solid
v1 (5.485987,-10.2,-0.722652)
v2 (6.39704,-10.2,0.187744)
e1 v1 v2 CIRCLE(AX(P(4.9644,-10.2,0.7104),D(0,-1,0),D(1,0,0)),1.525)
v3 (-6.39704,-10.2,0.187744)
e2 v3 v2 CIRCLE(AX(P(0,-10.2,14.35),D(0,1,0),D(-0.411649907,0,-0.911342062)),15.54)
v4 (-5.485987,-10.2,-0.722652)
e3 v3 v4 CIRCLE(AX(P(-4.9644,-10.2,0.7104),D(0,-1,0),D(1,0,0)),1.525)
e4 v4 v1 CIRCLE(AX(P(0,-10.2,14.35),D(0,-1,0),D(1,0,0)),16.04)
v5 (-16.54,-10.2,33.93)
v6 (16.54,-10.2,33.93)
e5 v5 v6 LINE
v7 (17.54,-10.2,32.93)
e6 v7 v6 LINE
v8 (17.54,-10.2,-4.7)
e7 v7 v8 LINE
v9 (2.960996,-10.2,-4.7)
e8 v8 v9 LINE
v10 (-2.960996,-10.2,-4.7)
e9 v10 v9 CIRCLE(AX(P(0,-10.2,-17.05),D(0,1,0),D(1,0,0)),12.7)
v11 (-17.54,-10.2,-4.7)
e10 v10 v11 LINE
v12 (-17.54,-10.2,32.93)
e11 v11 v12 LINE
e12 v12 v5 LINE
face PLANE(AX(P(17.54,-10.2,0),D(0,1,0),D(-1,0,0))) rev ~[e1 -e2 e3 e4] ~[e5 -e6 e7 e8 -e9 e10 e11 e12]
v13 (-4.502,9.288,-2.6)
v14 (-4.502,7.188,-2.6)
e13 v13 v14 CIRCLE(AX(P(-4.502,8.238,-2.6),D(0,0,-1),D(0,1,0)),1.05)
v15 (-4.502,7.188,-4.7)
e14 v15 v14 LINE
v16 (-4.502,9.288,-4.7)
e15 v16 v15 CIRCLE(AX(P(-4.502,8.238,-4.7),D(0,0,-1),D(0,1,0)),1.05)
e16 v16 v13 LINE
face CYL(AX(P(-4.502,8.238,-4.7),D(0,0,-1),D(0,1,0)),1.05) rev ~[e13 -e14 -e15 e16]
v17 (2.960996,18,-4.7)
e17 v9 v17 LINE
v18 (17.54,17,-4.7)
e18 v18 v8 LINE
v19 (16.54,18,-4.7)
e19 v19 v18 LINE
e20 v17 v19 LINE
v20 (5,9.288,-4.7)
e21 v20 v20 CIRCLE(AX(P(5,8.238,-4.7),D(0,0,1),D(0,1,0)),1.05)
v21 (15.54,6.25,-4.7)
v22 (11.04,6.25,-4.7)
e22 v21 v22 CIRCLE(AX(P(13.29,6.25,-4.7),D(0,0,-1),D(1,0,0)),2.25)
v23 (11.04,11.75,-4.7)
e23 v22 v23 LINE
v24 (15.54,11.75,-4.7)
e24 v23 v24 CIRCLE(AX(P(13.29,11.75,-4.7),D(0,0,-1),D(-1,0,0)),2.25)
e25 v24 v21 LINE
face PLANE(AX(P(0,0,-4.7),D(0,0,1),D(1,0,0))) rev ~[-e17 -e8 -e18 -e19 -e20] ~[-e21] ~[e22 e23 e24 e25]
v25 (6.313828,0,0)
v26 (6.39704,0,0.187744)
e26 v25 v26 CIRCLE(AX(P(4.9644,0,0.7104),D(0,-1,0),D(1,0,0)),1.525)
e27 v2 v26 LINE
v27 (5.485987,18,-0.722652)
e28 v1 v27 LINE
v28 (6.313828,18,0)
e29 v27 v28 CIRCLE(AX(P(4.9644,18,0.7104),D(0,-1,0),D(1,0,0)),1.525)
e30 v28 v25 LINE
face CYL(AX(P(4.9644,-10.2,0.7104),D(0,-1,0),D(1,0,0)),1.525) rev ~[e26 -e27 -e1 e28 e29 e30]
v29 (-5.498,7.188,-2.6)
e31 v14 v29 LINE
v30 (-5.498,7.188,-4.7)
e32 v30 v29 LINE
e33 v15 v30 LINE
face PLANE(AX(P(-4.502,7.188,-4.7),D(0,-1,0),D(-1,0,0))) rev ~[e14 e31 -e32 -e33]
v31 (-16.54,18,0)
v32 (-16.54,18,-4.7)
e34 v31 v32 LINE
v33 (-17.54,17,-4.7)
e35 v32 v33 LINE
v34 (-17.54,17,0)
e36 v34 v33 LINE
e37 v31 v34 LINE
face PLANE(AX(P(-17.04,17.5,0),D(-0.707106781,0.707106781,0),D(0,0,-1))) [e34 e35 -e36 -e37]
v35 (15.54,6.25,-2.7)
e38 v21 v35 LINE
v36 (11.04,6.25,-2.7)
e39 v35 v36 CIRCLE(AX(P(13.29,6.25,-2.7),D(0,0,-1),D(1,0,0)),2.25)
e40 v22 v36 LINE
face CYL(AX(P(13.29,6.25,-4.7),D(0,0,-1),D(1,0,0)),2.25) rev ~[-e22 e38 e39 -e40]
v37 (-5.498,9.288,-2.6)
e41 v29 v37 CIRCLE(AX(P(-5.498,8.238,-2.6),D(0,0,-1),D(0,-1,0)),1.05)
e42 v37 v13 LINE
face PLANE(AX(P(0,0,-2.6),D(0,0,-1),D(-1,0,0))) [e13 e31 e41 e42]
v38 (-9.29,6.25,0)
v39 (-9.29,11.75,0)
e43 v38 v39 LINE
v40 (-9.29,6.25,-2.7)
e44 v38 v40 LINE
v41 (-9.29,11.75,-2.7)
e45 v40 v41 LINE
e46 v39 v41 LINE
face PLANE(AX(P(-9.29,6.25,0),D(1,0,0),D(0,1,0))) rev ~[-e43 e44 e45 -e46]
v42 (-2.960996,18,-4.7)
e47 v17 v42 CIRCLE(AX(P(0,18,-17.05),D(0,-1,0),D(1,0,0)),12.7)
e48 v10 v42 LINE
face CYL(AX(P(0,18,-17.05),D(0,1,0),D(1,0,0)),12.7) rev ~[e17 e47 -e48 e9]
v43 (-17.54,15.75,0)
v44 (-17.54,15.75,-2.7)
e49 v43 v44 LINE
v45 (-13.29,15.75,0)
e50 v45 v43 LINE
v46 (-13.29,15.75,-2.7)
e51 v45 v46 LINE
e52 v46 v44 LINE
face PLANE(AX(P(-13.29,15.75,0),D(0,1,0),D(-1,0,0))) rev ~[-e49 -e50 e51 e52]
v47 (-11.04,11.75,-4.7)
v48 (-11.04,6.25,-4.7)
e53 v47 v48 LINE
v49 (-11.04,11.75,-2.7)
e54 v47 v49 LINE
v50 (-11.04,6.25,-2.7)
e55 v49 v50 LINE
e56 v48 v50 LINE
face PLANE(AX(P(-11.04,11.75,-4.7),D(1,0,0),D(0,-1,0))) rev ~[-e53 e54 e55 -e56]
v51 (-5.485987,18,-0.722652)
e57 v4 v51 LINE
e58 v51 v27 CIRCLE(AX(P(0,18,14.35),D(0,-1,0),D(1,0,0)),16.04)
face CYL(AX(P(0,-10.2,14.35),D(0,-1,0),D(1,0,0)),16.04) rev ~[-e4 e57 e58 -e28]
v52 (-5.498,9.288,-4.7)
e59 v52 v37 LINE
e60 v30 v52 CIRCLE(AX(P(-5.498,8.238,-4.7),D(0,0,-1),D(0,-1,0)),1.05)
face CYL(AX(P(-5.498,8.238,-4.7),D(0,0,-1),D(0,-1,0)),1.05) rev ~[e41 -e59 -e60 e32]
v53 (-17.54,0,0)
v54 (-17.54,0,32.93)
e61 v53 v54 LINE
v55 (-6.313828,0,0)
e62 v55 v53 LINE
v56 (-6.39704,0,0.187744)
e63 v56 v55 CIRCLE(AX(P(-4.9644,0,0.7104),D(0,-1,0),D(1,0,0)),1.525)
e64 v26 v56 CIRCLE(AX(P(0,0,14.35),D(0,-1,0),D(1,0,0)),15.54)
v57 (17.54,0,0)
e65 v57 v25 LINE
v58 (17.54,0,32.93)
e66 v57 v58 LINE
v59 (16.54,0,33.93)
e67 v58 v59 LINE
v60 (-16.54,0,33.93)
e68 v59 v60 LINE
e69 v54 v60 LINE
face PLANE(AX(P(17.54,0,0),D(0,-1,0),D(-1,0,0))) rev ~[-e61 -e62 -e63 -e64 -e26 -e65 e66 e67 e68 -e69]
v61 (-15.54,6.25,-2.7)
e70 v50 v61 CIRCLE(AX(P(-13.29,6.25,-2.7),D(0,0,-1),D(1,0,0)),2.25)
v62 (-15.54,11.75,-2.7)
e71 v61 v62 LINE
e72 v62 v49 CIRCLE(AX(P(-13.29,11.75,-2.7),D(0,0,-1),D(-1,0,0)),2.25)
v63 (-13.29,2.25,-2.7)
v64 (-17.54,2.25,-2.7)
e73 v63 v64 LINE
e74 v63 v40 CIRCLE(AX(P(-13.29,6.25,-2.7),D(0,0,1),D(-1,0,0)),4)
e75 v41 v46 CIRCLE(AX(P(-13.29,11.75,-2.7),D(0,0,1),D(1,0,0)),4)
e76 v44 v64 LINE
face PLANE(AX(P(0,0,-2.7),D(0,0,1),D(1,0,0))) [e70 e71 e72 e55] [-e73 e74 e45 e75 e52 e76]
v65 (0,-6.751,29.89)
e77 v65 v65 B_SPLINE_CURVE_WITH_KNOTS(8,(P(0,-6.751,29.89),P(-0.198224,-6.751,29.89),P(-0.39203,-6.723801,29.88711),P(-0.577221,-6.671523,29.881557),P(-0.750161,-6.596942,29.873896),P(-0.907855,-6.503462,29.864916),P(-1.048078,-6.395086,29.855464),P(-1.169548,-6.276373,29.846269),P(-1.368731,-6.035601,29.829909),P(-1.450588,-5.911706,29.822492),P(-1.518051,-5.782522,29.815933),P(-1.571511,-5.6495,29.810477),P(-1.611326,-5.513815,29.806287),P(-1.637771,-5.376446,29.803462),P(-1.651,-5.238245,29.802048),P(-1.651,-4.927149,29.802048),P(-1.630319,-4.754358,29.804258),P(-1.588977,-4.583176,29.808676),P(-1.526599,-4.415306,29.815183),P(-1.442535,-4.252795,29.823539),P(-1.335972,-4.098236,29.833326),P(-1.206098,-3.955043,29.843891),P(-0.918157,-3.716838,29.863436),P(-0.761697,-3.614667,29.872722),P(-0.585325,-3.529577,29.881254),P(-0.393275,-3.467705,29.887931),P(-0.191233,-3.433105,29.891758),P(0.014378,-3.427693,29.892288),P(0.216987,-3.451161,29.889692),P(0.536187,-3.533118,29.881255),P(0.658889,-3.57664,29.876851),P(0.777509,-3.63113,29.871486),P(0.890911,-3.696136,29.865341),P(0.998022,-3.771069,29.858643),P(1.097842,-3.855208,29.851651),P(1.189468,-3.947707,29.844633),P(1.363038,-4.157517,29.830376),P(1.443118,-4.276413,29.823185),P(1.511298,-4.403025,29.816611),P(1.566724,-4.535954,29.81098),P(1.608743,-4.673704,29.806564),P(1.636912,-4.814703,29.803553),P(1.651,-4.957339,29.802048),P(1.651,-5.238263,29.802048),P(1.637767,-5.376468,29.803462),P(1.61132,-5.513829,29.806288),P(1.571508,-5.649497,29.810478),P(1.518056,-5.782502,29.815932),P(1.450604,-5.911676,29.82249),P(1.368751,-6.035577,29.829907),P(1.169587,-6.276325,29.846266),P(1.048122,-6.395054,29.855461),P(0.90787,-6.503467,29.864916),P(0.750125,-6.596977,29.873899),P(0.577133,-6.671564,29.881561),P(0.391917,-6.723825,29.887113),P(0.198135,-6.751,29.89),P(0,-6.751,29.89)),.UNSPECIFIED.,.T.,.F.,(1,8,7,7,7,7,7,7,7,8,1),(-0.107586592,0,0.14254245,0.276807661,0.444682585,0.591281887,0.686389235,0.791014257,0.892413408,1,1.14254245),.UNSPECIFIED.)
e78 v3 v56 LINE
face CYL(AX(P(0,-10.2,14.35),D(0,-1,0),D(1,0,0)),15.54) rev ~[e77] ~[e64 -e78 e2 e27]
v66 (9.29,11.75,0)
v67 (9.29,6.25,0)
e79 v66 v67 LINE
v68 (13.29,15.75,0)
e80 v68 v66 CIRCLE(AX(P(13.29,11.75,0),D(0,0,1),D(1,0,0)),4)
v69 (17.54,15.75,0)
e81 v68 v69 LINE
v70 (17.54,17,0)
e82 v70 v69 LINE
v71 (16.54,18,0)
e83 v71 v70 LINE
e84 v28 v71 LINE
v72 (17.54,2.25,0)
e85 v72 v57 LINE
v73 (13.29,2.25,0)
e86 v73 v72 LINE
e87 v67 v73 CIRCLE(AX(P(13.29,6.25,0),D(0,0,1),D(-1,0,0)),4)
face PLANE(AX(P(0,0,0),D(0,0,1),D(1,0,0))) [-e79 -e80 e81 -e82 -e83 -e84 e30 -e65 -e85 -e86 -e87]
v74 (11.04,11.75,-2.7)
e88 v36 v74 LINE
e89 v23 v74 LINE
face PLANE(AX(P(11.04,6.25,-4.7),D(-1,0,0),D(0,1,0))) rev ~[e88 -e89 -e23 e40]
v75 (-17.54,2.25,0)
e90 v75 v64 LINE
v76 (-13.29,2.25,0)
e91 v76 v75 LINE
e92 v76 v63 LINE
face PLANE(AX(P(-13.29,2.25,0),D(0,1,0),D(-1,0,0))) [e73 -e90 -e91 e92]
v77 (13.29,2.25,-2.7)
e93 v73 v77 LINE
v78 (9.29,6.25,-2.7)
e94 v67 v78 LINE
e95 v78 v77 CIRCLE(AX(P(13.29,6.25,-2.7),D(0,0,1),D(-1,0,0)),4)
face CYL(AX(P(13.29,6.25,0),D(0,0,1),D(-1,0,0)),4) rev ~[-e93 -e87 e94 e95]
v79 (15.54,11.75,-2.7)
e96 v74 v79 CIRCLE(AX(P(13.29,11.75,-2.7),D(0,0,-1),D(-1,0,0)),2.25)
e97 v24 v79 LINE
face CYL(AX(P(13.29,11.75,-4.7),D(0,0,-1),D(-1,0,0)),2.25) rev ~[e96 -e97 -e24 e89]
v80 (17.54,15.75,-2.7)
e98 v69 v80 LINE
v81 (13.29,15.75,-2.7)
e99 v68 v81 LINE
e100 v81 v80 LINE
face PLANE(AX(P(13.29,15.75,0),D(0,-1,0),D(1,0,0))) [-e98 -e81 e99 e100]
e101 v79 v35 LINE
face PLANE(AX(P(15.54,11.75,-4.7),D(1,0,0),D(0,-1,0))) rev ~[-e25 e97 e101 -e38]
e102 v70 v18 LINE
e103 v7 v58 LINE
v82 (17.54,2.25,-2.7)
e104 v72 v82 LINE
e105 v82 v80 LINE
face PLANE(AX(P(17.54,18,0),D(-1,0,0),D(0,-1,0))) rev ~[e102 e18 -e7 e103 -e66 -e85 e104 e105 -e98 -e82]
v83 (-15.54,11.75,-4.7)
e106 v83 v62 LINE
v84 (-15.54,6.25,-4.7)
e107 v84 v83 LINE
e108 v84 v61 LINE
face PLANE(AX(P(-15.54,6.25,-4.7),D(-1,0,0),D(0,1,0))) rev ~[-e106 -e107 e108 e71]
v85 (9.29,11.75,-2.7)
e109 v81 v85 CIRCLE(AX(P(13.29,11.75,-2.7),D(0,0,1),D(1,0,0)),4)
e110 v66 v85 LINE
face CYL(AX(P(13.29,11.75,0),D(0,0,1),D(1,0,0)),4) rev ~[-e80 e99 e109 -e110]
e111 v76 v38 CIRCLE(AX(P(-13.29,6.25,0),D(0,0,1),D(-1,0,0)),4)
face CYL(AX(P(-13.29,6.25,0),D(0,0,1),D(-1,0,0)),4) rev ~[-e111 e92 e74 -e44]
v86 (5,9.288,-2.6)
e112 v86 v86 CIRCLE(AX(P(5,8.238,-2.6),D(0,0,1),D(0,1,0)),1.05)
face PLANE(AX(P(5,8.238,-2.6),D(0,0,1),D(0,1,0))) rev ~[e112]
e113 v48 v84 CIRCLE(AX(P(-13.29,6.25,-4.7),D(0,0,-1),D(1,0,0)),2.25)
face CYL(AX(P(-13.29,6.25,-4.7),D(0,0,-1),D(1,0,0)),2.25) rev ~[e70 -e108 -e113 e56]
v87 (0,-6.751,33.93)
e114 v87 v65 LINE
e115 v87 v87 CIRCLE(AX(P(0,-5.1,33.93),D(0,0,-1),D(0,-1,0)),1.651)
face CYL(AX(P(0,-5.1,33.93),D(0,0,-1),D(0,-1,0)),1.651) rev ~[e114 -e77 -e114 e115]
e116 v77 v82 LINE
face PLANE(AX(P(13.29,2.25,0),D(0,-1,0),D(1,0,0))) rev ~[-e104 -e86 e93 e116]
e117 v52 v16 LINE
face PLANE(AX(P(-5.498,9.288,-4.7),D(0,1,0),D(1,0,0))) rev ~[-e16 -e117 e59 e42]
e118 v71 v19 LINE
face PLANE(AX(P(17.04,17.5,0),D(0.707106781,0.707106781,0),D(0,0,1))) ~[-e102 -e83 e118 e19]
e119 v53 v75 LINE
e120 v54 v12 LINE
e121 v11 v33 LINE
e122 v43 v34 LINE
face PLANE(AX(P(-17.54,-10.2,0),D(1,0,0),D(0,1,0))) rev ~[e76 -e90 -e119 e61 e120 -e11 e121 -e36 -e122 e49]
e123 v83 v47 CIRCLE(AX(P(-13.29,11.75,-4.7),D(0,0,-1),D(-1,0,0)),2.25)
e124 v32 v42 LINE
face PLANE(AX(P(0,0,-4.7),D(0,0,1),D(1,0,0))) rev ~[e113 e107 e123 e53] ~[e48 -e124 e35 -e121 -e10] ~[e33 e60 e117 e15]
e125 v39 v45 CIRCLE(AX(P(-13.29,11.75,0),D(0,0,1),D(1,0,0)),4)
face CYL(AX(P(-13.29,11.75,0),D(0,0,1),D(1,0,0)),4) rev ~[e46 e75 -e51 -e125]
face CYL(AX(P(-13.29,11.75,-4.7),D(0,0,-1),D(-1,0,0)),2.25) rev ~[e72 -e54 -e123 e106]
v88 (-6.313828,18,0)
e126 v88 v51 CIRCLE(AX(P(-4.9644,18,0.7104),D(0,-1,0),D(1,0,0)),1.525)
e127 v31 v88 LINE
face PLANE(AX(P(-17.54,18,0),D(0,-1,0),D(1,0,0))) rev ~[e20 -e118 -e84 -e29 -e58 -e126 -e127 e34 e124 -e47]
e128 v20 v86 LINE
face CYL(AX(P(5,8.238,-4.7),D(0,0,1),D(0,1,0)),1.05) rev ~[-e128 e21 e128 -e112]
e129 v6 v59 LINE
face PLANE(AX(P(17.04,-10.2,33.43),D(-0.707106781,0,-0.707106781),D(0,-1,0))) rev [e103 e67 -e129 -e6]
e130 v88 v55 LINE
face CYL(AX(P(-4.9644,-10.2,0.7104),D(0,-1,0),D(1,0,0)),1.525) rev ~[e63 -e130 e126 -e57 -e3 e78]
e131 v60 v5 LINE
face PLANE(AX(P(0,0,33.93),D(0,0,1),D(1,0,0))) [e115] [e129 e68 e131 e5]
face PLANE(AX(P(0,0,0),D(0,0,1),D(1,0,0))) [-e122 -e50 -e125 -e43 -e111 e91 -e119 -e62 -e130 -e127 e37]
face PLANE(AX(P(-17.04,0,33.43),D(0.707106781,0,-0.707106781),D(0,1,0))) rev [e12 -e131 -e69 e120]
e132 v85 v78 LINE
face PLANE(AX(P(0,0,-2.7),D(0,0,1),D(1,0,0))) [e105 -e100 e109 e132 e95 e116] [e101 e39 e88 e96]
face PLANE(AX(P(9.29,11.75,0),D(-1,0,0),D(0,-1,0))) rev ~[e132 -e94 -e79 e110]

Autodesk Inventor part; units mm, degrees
ref_plane "YZ Plane" through (0, 0, 0) normal (1, 0, 0) x (0, 1, 0)
ref_plane "XZ Plane" through (0, 0, 0) normal (0, 1, 0) x (-1, 0, 0)
ref_plane "XY Plane" through (0, 0, 0) normal (0, 0, 1) x (1, 0, 0)
sketch "Sketch4" plane through (0, 0, 0) normal (0, 0, 1) x (1, 0, 0)
  line L0 (-17.54, 18) -> (17.54, 18)
  line L1 (17.54, 18) -> (17.54, -10.2)
  line L2 (17.54, -10.2) -> (-17.54, -10.2)
  line L3 (-17.54, -10.2) -> (-17.54, 18)
  point P0 (0, 0)
  dimension "d24" = 28.2
  dimension "WIDTH" = 35.08
  dimension "d26" = 17.54
  dimension "d28" = 10.2
extrude "Extrusion3" add sketch "Sketch4" against normal blind 4.7
sketch "Sketch5" plane through (0, 0, 0) normal (0, 0, 1) x (1, 0, 0)
  line L0 (-17.54, -10.2) -> (17.54, -10.2)
  line L1 (17.54, -10.2) -> (17.54, 0)
  line L2 (17.54, 0) -> (-17.54, 0)
  line L3 (-17.54, 0) -> (-17.54, -10.2)
  line L4 (-17.54, 18) -> (-17.54, -10.2) projected
  line L5 (-17.54, -10.2) -> (17.54, -10.2) projected
  line L6 (17.54, -10.2) -> (17.54, 18) projected
  point P0 (0, 0)
  dimension "d31" = 0
  dimension "d32" = 0
  dimension "d33" = 0
  dimension "d34" = 0
extrude "Extrusion4" add sketch "Sketch5" along normal blind 33.93
sketch "Sketch7" plane through (-17.54, -10.2, -4.7) normal (0, -1, 0) x (1, 0, 0)
  circle A0 centre (17.54, 19.05) radius 15.29
  line L0 (35.08, 0) -> (35.08, 38.63) projected
  line L1 (0, 38.63) -> (35.08, 38.63) projected
  line L2 (35.08, 0) -> (0, 0) projected
  line L3 (0, 38.63) -> (0, 0) projected
  circle A1 centre (17.54, 19.05) radius 15.79
  circle A2 centre (12.6611, 5.6453) radius 1.525
  circle A3 centre (22.4189, 5.6453) radius 1.525
  line L4 (17.54, 19.05) -> (17.54, 6.8001)
  line L5 (12.6611, 5.6453) -> (17.54, 19.05)
  line L6 (22.4189, 5.6453) -> (17.54, 19.05)
  point P0 (22.9405, 4.2123)
  point P1 (21.6565, 4.3246)
  point P2 (13.4235, 4.3246)
  point P3 (12.1395, 4.2123)
  point P4 (23.8519, 5.1236)
  point P5 (11.2281, 5.1236)
  dimension "PILOT_HOLE" = 30.58
  dimension "d201" = 19.05
  dimension "d225" = 17.54
  dimension "d226" = 31.58
  dimension "d227" = 20
  dimension "d228" = 20
  dimension "d229" = 3.05
  dimension "d230" = 3.05
  dimension "d231" = 14.265
  dimension "d232" = 14.265
sketch "Sketch9" plane through (0, 0, -4.7) normal (0, 0, -1) x (-1, 0, 0)
  line L0 (17.54, 18) -> (-17.54, 18) projected
  line L1 (17.54, 0) -> (-17.54, 0) projected
  line L2 (0, 5.488) -> (0, 10.988) construction
  line L3 (2.25, 5.488) -> (2.25, 10.988)
  line L4 (-2.25, 10.988) -> (-2.25, 5.488)
  arc A0 (-2.25, 5.488) -> (2.25, 5.488) centre (0, 5.488) ccw
  arc A1 (2.25, 10.988) -> (-2.25, 10.988) centre (0, 10.988) ccw
  line L5 (5.498, 8.238) -> (4.502, 8.238) construction
  line L6 (5.498, 9.288) -> (4.502, 9.288)
  line L7 (4.502, 7.188) -> (5.498, 7.188)
  arc A2 (5.498, 7.188) -> (5.498, 9.288) centre (5.498, 8.238) ccw
  arc A3 (4.502, 9.288) -> (4.502, 7.188) centre (4.502, 8.238) ccw
  point P0 (0, 0)
  point P1 (-5, 8.238)
  point P2 (0, 8.238)
  point P3 (5, 8.238)
  dimension "d183" = 18
  dimension "d185" = 2.25
  dimension "d186" = 5.5
  dimension "d187" = 0
  dimension "d188" = 8.238
  dimension "d189" = 1.05
  dimension "d190" = 0.996
  dimension "d191" = 0
  dimension "d192" = 5
  dimension "d203" = 0
  dimension "d204" = 5
extrude "Extrusion6" cut sketch "Sketch9" against normal blind 2.1 contours A2 L7 A3 L6
extrude "Extrusion7" cut sketch "Sketch7" against normal up to surface (10.2 mm away) contours A0 A3 L6 L5 A2 | A2 A0 | A0 A2 | A3 A0 | A0 A3 | A2 L5 L6 A3 A0 | A0 A3 A1 A2 picked at (17.54, 3.6354)
hole "Hole3" at (5, 8.238, -4.7) direction (0, 0, 1) diameter 2.1 depth 2.1
chamfer "Chamfer10" distance 1 angle 45 4 edges at (17.54, -5.1, 33.93) (-17.54, -5.1, 33.93) (17.54, 18, -2.35) (-17.54, 18, -2.35)
sketch "Sketch13" plane through (-16.54, 18, 0) normal (0, 1, 0) x (1, 0, 0)
  circle A0 centre (16.54, 17.05) radius 12.7
  line L0 (0, 4.7) -> (33.08, 4.7) projected
  point P0 (16.54, 0)
  dimension "d196" = 0
  dimension "d197" = 25.4
  dimension "d224" = 12.35
extrude "Extrusion11" cut sketch "Sketch13" against normal up to surface (28.2 mm away)
sketch "Sketch14" plane through (0, 0, 33.93) normal (0, 0, 1) x (1, 0, 0)
  line L0 (-17.54, -10.2) -> (17.54, -10.2) projected
  point P0 (0, 0)
  point P1 (0, -5.1)
  point P2 (-16.54, -10.2)
  point P3 (16.54, -10.2)
  dimension "d212" = 0
  dimension "d213" = 5.1
  dimension "d214" = 10.2
hole "Hole4" at (0, -5.1, 33.93) direction (0, 0, -1) diameter 3.302 end up to surface thread size "8-32 UNC" class "2B" standard "ANSI Unified Screw Threads"
sketch "Sketch20" plane through (0, 0, -4.7) normal (0, 0, -1) x (-1, 0, 0)
  line L0 (-17.54, 18) -> (17.54, 18) projected
  line L1 (-17.54, 0) -> (-17.54, 18) projected
  line L2 (-13.29, 6.25) -> (-13.29, 11.75) construction
  line L3 (-11.04, 6.25) -> (-11.04, 11.75)
  line L4 (-15.54, 11.75) -> (-15.54, 6.25)
  arc A0 (-15.54, 6.25) -> (-11.04, 6.25) centre (-13.29, 6.25) ccw
  arc A1 (-11.04, 11.75) -> (-15.54, 11.75) centre (-13.29, 11.75) ccw
  line L5 (5.2784, 0) -> (5.2784, 18) projected
  line L6 (17.54, 18) -> (-17.54, 18) projected
  line L7 (17.54, -10.2) -> (17.54, 18) projected
  line L8 (13.29, 6.25) -> (13.29, 11.75) construction
  line L9 (15.54, 6.25) -> (15.54, 11.75)
  line L10 (11.04, 11.75) -> (11.04, 6.25)
  arc A2 (11.04, 6.25) -> (15.54, 6.25) centre (13.29, 6.25) ccw
  arc A3 (15.54, 11.75) -> (11.04, 11.75) centre (13.29, 11.75) ccw
  circle A4 centre (-5, 8.238) radius 1.05 projected
  point P0 (0, 0)
  point P1 (-13.29, 9)
  point P2 (-5.2784, 18)
  point P3 (17.54, 0)
  point P4 (13.29, 9)
  point P5 (16.54, 18)
  dimension "d251" = 18
  dimension "d252" = 9
  dimension "d253" = 12.2616
  dimension "d254" = 4.25
  dimension "d255" = 4.5
  dimension "d256" = 5.5
  dimension "d257" = 18
  dimension "d258" = 12.2616
  dimension "d259" = 9
  dimension "d261" = 4.5
  dimension "d262" = 5.5
  dimension "d293" = 4.25
extrude "Extrusion15" cut sketch "Sketch20" against normal through all contours A0 L4 A1 L3 | A2 L10 A3 L9
sketch "Sketch21" plane through (0, 0, 0) normal (0, 0, 1) x (1, 0, 0)
  line L0 (17.54, 18) -> (-17.54, 18) projected
  line L1 (17.54, 0) -> (17.54, 18) projected
  line L2 (17.54, 0) -> (-17.54, 0) projected
  line L3 (-5.2784, 0) -> (-5.2784, 18) projected
  line L4 (13.29, 11.75) -> (13.29, 6.25) construction
  line L5 (9.29, 11.75) -> (9.29, 6.25)
  line L6 (17.29, 6.25) -> (17.29, 11.75)
  arc A0 (17.29, 11.75) -> (9.29, 11.75) centre (13.29, 11.75) ccw
  arc A1 (9.29, 6.25) -> (17.29, 6.25) centre (13.29, 6.25) ccw
  line L7 (-13.29, 11.75) -> (-13.29, 6.25) construction
  line L8 (-17.29, 11.75) -> (-17.29, 6.25)
  line L9 (-9.29, 6.25) -> (-9.29, 11.75)
  arc A2 (-9.29, 11.75) -> (-17.29, 11.75) centre (-13.29, 11.75) ccw
  arc A3 (-17.29, 6.25) -> (-9.29, 6.25) centre (-13.29, 6.25) ccw
  line L10 (-17.54, 18) -> (-17.54, 0) projected
  line L11 (-13.29, 2.25) -> (-17.54, 2.25)
  line L12 (-13.29, 15.75) -> (-17.54, 15.75)
  line L13 (-17.54, -10.2) -> (-17.54, 18) projected
  line L14 (13.29, 15.75) -> (17.54, 15.75)
  line L15 (13.29, 2.25) -> (17.54, 2.25)
  point P0 (0, 0)
  point P1 (13.29, 9)
  point P2 (5.2784, 18)
  point P3 (-13.29, 9)
  point P4 (-17.54, 15.75)
  point P5 (-16.54, 18)
  dimension "d265" = 9
  dimension "d266" = 4.25
  dimension "d267" = 9
  dimension "d269" = 8
  dimension "d270" = 5.5
  dimension "d271" = 8
  dimension "d272" = 5.5
  dimension "d295" = 4.25
extrude "Extrusion16" cut sketch "Sketch21" against normal blind 2.7 contours L1 L15 A1 L6 A0 L14 | A0 L6 A1 L5 | L12 A2 L8 A3 L11 L10 | A2 L9 A3 L8
sketch "Sketch26" plane through (-17.54, -10.2, -4.7) normal (0, -1, 0) x (1, 0, 0)
  circle A0 centre (17.54, 19.05) radius 15.54
  line L0 (34.4, 0) -> (34.4, 38.38)
  line L1 (0, 38.38) -> (34.4, 38.38)
  line L2 (34.4, 0) -> (0, 0)
  line L3 (0, 0) -> (0, 38.38)
  circle A1 centre (17.54, 19.05) radius 16.04
  circle A2 centre (12.5756, 5.4104) radius 1.525
  circle A3 centre (22.5044, 5.4104) radius 1.525
  line L4 (17.54, 19.05) -> (17.54, 6.8001)
  line L5 (12.5756, 5.4104) -> (17.54, 19.05)
  line L6 (22.5044, 5.4104) -> (17.54, 19.05)
  point P0 (17.54, 4.7)
  point P1 (22.6005, 4.2123)
  point P2 (21.3165, 4.3246)
  point P3 (13.0835, 4.3246)
  point P4 (11.7995, 4.2123)
  point P5 (23.5119, 5.1236)
  point P6 (10.8881, 5.1236)
  point P7 (11.1429, 4.8878)
  point P8 (12.054, 3.9773)
  point P9 (23.026, 3.9773)
  point P10 (23.9371, 4.8878)
  dimension "d314" = 31.08
  dimension "d315" = 19.05
  dimension "d316" = 17.54
  dimension "d317" = 32.08
  dimension "d318" = 20
  dimension "d319" = 20
  dimension "d320" = 3.05
  dimension "d321" = 3.05
  dimension "d322" = 14.515
  dimension "d323" = 14.515
extrude "Extrusion19" cut sketch "Sketch26" against normal through all contours A0 A3 L6 L5 A2 | A2 A0 | A0 A2 | A3 A0 | A0 A3 | A2 L5 L6 A3 A0 | A0 A3 A1 A2 picked at (17.54, 3.3865)
equation "\"TOLERANCE\" = 0.05"
equation "\"BEAM_HEIGHT\" = 19.05"
equation "\"d309\" = 19.05"
equation "\"d311\" = 0.05"
equation "\"d324\" = 19.05"
equation "\"d326\" = 0.05"
properties part number "ADAPTER_SM1L03-new"
